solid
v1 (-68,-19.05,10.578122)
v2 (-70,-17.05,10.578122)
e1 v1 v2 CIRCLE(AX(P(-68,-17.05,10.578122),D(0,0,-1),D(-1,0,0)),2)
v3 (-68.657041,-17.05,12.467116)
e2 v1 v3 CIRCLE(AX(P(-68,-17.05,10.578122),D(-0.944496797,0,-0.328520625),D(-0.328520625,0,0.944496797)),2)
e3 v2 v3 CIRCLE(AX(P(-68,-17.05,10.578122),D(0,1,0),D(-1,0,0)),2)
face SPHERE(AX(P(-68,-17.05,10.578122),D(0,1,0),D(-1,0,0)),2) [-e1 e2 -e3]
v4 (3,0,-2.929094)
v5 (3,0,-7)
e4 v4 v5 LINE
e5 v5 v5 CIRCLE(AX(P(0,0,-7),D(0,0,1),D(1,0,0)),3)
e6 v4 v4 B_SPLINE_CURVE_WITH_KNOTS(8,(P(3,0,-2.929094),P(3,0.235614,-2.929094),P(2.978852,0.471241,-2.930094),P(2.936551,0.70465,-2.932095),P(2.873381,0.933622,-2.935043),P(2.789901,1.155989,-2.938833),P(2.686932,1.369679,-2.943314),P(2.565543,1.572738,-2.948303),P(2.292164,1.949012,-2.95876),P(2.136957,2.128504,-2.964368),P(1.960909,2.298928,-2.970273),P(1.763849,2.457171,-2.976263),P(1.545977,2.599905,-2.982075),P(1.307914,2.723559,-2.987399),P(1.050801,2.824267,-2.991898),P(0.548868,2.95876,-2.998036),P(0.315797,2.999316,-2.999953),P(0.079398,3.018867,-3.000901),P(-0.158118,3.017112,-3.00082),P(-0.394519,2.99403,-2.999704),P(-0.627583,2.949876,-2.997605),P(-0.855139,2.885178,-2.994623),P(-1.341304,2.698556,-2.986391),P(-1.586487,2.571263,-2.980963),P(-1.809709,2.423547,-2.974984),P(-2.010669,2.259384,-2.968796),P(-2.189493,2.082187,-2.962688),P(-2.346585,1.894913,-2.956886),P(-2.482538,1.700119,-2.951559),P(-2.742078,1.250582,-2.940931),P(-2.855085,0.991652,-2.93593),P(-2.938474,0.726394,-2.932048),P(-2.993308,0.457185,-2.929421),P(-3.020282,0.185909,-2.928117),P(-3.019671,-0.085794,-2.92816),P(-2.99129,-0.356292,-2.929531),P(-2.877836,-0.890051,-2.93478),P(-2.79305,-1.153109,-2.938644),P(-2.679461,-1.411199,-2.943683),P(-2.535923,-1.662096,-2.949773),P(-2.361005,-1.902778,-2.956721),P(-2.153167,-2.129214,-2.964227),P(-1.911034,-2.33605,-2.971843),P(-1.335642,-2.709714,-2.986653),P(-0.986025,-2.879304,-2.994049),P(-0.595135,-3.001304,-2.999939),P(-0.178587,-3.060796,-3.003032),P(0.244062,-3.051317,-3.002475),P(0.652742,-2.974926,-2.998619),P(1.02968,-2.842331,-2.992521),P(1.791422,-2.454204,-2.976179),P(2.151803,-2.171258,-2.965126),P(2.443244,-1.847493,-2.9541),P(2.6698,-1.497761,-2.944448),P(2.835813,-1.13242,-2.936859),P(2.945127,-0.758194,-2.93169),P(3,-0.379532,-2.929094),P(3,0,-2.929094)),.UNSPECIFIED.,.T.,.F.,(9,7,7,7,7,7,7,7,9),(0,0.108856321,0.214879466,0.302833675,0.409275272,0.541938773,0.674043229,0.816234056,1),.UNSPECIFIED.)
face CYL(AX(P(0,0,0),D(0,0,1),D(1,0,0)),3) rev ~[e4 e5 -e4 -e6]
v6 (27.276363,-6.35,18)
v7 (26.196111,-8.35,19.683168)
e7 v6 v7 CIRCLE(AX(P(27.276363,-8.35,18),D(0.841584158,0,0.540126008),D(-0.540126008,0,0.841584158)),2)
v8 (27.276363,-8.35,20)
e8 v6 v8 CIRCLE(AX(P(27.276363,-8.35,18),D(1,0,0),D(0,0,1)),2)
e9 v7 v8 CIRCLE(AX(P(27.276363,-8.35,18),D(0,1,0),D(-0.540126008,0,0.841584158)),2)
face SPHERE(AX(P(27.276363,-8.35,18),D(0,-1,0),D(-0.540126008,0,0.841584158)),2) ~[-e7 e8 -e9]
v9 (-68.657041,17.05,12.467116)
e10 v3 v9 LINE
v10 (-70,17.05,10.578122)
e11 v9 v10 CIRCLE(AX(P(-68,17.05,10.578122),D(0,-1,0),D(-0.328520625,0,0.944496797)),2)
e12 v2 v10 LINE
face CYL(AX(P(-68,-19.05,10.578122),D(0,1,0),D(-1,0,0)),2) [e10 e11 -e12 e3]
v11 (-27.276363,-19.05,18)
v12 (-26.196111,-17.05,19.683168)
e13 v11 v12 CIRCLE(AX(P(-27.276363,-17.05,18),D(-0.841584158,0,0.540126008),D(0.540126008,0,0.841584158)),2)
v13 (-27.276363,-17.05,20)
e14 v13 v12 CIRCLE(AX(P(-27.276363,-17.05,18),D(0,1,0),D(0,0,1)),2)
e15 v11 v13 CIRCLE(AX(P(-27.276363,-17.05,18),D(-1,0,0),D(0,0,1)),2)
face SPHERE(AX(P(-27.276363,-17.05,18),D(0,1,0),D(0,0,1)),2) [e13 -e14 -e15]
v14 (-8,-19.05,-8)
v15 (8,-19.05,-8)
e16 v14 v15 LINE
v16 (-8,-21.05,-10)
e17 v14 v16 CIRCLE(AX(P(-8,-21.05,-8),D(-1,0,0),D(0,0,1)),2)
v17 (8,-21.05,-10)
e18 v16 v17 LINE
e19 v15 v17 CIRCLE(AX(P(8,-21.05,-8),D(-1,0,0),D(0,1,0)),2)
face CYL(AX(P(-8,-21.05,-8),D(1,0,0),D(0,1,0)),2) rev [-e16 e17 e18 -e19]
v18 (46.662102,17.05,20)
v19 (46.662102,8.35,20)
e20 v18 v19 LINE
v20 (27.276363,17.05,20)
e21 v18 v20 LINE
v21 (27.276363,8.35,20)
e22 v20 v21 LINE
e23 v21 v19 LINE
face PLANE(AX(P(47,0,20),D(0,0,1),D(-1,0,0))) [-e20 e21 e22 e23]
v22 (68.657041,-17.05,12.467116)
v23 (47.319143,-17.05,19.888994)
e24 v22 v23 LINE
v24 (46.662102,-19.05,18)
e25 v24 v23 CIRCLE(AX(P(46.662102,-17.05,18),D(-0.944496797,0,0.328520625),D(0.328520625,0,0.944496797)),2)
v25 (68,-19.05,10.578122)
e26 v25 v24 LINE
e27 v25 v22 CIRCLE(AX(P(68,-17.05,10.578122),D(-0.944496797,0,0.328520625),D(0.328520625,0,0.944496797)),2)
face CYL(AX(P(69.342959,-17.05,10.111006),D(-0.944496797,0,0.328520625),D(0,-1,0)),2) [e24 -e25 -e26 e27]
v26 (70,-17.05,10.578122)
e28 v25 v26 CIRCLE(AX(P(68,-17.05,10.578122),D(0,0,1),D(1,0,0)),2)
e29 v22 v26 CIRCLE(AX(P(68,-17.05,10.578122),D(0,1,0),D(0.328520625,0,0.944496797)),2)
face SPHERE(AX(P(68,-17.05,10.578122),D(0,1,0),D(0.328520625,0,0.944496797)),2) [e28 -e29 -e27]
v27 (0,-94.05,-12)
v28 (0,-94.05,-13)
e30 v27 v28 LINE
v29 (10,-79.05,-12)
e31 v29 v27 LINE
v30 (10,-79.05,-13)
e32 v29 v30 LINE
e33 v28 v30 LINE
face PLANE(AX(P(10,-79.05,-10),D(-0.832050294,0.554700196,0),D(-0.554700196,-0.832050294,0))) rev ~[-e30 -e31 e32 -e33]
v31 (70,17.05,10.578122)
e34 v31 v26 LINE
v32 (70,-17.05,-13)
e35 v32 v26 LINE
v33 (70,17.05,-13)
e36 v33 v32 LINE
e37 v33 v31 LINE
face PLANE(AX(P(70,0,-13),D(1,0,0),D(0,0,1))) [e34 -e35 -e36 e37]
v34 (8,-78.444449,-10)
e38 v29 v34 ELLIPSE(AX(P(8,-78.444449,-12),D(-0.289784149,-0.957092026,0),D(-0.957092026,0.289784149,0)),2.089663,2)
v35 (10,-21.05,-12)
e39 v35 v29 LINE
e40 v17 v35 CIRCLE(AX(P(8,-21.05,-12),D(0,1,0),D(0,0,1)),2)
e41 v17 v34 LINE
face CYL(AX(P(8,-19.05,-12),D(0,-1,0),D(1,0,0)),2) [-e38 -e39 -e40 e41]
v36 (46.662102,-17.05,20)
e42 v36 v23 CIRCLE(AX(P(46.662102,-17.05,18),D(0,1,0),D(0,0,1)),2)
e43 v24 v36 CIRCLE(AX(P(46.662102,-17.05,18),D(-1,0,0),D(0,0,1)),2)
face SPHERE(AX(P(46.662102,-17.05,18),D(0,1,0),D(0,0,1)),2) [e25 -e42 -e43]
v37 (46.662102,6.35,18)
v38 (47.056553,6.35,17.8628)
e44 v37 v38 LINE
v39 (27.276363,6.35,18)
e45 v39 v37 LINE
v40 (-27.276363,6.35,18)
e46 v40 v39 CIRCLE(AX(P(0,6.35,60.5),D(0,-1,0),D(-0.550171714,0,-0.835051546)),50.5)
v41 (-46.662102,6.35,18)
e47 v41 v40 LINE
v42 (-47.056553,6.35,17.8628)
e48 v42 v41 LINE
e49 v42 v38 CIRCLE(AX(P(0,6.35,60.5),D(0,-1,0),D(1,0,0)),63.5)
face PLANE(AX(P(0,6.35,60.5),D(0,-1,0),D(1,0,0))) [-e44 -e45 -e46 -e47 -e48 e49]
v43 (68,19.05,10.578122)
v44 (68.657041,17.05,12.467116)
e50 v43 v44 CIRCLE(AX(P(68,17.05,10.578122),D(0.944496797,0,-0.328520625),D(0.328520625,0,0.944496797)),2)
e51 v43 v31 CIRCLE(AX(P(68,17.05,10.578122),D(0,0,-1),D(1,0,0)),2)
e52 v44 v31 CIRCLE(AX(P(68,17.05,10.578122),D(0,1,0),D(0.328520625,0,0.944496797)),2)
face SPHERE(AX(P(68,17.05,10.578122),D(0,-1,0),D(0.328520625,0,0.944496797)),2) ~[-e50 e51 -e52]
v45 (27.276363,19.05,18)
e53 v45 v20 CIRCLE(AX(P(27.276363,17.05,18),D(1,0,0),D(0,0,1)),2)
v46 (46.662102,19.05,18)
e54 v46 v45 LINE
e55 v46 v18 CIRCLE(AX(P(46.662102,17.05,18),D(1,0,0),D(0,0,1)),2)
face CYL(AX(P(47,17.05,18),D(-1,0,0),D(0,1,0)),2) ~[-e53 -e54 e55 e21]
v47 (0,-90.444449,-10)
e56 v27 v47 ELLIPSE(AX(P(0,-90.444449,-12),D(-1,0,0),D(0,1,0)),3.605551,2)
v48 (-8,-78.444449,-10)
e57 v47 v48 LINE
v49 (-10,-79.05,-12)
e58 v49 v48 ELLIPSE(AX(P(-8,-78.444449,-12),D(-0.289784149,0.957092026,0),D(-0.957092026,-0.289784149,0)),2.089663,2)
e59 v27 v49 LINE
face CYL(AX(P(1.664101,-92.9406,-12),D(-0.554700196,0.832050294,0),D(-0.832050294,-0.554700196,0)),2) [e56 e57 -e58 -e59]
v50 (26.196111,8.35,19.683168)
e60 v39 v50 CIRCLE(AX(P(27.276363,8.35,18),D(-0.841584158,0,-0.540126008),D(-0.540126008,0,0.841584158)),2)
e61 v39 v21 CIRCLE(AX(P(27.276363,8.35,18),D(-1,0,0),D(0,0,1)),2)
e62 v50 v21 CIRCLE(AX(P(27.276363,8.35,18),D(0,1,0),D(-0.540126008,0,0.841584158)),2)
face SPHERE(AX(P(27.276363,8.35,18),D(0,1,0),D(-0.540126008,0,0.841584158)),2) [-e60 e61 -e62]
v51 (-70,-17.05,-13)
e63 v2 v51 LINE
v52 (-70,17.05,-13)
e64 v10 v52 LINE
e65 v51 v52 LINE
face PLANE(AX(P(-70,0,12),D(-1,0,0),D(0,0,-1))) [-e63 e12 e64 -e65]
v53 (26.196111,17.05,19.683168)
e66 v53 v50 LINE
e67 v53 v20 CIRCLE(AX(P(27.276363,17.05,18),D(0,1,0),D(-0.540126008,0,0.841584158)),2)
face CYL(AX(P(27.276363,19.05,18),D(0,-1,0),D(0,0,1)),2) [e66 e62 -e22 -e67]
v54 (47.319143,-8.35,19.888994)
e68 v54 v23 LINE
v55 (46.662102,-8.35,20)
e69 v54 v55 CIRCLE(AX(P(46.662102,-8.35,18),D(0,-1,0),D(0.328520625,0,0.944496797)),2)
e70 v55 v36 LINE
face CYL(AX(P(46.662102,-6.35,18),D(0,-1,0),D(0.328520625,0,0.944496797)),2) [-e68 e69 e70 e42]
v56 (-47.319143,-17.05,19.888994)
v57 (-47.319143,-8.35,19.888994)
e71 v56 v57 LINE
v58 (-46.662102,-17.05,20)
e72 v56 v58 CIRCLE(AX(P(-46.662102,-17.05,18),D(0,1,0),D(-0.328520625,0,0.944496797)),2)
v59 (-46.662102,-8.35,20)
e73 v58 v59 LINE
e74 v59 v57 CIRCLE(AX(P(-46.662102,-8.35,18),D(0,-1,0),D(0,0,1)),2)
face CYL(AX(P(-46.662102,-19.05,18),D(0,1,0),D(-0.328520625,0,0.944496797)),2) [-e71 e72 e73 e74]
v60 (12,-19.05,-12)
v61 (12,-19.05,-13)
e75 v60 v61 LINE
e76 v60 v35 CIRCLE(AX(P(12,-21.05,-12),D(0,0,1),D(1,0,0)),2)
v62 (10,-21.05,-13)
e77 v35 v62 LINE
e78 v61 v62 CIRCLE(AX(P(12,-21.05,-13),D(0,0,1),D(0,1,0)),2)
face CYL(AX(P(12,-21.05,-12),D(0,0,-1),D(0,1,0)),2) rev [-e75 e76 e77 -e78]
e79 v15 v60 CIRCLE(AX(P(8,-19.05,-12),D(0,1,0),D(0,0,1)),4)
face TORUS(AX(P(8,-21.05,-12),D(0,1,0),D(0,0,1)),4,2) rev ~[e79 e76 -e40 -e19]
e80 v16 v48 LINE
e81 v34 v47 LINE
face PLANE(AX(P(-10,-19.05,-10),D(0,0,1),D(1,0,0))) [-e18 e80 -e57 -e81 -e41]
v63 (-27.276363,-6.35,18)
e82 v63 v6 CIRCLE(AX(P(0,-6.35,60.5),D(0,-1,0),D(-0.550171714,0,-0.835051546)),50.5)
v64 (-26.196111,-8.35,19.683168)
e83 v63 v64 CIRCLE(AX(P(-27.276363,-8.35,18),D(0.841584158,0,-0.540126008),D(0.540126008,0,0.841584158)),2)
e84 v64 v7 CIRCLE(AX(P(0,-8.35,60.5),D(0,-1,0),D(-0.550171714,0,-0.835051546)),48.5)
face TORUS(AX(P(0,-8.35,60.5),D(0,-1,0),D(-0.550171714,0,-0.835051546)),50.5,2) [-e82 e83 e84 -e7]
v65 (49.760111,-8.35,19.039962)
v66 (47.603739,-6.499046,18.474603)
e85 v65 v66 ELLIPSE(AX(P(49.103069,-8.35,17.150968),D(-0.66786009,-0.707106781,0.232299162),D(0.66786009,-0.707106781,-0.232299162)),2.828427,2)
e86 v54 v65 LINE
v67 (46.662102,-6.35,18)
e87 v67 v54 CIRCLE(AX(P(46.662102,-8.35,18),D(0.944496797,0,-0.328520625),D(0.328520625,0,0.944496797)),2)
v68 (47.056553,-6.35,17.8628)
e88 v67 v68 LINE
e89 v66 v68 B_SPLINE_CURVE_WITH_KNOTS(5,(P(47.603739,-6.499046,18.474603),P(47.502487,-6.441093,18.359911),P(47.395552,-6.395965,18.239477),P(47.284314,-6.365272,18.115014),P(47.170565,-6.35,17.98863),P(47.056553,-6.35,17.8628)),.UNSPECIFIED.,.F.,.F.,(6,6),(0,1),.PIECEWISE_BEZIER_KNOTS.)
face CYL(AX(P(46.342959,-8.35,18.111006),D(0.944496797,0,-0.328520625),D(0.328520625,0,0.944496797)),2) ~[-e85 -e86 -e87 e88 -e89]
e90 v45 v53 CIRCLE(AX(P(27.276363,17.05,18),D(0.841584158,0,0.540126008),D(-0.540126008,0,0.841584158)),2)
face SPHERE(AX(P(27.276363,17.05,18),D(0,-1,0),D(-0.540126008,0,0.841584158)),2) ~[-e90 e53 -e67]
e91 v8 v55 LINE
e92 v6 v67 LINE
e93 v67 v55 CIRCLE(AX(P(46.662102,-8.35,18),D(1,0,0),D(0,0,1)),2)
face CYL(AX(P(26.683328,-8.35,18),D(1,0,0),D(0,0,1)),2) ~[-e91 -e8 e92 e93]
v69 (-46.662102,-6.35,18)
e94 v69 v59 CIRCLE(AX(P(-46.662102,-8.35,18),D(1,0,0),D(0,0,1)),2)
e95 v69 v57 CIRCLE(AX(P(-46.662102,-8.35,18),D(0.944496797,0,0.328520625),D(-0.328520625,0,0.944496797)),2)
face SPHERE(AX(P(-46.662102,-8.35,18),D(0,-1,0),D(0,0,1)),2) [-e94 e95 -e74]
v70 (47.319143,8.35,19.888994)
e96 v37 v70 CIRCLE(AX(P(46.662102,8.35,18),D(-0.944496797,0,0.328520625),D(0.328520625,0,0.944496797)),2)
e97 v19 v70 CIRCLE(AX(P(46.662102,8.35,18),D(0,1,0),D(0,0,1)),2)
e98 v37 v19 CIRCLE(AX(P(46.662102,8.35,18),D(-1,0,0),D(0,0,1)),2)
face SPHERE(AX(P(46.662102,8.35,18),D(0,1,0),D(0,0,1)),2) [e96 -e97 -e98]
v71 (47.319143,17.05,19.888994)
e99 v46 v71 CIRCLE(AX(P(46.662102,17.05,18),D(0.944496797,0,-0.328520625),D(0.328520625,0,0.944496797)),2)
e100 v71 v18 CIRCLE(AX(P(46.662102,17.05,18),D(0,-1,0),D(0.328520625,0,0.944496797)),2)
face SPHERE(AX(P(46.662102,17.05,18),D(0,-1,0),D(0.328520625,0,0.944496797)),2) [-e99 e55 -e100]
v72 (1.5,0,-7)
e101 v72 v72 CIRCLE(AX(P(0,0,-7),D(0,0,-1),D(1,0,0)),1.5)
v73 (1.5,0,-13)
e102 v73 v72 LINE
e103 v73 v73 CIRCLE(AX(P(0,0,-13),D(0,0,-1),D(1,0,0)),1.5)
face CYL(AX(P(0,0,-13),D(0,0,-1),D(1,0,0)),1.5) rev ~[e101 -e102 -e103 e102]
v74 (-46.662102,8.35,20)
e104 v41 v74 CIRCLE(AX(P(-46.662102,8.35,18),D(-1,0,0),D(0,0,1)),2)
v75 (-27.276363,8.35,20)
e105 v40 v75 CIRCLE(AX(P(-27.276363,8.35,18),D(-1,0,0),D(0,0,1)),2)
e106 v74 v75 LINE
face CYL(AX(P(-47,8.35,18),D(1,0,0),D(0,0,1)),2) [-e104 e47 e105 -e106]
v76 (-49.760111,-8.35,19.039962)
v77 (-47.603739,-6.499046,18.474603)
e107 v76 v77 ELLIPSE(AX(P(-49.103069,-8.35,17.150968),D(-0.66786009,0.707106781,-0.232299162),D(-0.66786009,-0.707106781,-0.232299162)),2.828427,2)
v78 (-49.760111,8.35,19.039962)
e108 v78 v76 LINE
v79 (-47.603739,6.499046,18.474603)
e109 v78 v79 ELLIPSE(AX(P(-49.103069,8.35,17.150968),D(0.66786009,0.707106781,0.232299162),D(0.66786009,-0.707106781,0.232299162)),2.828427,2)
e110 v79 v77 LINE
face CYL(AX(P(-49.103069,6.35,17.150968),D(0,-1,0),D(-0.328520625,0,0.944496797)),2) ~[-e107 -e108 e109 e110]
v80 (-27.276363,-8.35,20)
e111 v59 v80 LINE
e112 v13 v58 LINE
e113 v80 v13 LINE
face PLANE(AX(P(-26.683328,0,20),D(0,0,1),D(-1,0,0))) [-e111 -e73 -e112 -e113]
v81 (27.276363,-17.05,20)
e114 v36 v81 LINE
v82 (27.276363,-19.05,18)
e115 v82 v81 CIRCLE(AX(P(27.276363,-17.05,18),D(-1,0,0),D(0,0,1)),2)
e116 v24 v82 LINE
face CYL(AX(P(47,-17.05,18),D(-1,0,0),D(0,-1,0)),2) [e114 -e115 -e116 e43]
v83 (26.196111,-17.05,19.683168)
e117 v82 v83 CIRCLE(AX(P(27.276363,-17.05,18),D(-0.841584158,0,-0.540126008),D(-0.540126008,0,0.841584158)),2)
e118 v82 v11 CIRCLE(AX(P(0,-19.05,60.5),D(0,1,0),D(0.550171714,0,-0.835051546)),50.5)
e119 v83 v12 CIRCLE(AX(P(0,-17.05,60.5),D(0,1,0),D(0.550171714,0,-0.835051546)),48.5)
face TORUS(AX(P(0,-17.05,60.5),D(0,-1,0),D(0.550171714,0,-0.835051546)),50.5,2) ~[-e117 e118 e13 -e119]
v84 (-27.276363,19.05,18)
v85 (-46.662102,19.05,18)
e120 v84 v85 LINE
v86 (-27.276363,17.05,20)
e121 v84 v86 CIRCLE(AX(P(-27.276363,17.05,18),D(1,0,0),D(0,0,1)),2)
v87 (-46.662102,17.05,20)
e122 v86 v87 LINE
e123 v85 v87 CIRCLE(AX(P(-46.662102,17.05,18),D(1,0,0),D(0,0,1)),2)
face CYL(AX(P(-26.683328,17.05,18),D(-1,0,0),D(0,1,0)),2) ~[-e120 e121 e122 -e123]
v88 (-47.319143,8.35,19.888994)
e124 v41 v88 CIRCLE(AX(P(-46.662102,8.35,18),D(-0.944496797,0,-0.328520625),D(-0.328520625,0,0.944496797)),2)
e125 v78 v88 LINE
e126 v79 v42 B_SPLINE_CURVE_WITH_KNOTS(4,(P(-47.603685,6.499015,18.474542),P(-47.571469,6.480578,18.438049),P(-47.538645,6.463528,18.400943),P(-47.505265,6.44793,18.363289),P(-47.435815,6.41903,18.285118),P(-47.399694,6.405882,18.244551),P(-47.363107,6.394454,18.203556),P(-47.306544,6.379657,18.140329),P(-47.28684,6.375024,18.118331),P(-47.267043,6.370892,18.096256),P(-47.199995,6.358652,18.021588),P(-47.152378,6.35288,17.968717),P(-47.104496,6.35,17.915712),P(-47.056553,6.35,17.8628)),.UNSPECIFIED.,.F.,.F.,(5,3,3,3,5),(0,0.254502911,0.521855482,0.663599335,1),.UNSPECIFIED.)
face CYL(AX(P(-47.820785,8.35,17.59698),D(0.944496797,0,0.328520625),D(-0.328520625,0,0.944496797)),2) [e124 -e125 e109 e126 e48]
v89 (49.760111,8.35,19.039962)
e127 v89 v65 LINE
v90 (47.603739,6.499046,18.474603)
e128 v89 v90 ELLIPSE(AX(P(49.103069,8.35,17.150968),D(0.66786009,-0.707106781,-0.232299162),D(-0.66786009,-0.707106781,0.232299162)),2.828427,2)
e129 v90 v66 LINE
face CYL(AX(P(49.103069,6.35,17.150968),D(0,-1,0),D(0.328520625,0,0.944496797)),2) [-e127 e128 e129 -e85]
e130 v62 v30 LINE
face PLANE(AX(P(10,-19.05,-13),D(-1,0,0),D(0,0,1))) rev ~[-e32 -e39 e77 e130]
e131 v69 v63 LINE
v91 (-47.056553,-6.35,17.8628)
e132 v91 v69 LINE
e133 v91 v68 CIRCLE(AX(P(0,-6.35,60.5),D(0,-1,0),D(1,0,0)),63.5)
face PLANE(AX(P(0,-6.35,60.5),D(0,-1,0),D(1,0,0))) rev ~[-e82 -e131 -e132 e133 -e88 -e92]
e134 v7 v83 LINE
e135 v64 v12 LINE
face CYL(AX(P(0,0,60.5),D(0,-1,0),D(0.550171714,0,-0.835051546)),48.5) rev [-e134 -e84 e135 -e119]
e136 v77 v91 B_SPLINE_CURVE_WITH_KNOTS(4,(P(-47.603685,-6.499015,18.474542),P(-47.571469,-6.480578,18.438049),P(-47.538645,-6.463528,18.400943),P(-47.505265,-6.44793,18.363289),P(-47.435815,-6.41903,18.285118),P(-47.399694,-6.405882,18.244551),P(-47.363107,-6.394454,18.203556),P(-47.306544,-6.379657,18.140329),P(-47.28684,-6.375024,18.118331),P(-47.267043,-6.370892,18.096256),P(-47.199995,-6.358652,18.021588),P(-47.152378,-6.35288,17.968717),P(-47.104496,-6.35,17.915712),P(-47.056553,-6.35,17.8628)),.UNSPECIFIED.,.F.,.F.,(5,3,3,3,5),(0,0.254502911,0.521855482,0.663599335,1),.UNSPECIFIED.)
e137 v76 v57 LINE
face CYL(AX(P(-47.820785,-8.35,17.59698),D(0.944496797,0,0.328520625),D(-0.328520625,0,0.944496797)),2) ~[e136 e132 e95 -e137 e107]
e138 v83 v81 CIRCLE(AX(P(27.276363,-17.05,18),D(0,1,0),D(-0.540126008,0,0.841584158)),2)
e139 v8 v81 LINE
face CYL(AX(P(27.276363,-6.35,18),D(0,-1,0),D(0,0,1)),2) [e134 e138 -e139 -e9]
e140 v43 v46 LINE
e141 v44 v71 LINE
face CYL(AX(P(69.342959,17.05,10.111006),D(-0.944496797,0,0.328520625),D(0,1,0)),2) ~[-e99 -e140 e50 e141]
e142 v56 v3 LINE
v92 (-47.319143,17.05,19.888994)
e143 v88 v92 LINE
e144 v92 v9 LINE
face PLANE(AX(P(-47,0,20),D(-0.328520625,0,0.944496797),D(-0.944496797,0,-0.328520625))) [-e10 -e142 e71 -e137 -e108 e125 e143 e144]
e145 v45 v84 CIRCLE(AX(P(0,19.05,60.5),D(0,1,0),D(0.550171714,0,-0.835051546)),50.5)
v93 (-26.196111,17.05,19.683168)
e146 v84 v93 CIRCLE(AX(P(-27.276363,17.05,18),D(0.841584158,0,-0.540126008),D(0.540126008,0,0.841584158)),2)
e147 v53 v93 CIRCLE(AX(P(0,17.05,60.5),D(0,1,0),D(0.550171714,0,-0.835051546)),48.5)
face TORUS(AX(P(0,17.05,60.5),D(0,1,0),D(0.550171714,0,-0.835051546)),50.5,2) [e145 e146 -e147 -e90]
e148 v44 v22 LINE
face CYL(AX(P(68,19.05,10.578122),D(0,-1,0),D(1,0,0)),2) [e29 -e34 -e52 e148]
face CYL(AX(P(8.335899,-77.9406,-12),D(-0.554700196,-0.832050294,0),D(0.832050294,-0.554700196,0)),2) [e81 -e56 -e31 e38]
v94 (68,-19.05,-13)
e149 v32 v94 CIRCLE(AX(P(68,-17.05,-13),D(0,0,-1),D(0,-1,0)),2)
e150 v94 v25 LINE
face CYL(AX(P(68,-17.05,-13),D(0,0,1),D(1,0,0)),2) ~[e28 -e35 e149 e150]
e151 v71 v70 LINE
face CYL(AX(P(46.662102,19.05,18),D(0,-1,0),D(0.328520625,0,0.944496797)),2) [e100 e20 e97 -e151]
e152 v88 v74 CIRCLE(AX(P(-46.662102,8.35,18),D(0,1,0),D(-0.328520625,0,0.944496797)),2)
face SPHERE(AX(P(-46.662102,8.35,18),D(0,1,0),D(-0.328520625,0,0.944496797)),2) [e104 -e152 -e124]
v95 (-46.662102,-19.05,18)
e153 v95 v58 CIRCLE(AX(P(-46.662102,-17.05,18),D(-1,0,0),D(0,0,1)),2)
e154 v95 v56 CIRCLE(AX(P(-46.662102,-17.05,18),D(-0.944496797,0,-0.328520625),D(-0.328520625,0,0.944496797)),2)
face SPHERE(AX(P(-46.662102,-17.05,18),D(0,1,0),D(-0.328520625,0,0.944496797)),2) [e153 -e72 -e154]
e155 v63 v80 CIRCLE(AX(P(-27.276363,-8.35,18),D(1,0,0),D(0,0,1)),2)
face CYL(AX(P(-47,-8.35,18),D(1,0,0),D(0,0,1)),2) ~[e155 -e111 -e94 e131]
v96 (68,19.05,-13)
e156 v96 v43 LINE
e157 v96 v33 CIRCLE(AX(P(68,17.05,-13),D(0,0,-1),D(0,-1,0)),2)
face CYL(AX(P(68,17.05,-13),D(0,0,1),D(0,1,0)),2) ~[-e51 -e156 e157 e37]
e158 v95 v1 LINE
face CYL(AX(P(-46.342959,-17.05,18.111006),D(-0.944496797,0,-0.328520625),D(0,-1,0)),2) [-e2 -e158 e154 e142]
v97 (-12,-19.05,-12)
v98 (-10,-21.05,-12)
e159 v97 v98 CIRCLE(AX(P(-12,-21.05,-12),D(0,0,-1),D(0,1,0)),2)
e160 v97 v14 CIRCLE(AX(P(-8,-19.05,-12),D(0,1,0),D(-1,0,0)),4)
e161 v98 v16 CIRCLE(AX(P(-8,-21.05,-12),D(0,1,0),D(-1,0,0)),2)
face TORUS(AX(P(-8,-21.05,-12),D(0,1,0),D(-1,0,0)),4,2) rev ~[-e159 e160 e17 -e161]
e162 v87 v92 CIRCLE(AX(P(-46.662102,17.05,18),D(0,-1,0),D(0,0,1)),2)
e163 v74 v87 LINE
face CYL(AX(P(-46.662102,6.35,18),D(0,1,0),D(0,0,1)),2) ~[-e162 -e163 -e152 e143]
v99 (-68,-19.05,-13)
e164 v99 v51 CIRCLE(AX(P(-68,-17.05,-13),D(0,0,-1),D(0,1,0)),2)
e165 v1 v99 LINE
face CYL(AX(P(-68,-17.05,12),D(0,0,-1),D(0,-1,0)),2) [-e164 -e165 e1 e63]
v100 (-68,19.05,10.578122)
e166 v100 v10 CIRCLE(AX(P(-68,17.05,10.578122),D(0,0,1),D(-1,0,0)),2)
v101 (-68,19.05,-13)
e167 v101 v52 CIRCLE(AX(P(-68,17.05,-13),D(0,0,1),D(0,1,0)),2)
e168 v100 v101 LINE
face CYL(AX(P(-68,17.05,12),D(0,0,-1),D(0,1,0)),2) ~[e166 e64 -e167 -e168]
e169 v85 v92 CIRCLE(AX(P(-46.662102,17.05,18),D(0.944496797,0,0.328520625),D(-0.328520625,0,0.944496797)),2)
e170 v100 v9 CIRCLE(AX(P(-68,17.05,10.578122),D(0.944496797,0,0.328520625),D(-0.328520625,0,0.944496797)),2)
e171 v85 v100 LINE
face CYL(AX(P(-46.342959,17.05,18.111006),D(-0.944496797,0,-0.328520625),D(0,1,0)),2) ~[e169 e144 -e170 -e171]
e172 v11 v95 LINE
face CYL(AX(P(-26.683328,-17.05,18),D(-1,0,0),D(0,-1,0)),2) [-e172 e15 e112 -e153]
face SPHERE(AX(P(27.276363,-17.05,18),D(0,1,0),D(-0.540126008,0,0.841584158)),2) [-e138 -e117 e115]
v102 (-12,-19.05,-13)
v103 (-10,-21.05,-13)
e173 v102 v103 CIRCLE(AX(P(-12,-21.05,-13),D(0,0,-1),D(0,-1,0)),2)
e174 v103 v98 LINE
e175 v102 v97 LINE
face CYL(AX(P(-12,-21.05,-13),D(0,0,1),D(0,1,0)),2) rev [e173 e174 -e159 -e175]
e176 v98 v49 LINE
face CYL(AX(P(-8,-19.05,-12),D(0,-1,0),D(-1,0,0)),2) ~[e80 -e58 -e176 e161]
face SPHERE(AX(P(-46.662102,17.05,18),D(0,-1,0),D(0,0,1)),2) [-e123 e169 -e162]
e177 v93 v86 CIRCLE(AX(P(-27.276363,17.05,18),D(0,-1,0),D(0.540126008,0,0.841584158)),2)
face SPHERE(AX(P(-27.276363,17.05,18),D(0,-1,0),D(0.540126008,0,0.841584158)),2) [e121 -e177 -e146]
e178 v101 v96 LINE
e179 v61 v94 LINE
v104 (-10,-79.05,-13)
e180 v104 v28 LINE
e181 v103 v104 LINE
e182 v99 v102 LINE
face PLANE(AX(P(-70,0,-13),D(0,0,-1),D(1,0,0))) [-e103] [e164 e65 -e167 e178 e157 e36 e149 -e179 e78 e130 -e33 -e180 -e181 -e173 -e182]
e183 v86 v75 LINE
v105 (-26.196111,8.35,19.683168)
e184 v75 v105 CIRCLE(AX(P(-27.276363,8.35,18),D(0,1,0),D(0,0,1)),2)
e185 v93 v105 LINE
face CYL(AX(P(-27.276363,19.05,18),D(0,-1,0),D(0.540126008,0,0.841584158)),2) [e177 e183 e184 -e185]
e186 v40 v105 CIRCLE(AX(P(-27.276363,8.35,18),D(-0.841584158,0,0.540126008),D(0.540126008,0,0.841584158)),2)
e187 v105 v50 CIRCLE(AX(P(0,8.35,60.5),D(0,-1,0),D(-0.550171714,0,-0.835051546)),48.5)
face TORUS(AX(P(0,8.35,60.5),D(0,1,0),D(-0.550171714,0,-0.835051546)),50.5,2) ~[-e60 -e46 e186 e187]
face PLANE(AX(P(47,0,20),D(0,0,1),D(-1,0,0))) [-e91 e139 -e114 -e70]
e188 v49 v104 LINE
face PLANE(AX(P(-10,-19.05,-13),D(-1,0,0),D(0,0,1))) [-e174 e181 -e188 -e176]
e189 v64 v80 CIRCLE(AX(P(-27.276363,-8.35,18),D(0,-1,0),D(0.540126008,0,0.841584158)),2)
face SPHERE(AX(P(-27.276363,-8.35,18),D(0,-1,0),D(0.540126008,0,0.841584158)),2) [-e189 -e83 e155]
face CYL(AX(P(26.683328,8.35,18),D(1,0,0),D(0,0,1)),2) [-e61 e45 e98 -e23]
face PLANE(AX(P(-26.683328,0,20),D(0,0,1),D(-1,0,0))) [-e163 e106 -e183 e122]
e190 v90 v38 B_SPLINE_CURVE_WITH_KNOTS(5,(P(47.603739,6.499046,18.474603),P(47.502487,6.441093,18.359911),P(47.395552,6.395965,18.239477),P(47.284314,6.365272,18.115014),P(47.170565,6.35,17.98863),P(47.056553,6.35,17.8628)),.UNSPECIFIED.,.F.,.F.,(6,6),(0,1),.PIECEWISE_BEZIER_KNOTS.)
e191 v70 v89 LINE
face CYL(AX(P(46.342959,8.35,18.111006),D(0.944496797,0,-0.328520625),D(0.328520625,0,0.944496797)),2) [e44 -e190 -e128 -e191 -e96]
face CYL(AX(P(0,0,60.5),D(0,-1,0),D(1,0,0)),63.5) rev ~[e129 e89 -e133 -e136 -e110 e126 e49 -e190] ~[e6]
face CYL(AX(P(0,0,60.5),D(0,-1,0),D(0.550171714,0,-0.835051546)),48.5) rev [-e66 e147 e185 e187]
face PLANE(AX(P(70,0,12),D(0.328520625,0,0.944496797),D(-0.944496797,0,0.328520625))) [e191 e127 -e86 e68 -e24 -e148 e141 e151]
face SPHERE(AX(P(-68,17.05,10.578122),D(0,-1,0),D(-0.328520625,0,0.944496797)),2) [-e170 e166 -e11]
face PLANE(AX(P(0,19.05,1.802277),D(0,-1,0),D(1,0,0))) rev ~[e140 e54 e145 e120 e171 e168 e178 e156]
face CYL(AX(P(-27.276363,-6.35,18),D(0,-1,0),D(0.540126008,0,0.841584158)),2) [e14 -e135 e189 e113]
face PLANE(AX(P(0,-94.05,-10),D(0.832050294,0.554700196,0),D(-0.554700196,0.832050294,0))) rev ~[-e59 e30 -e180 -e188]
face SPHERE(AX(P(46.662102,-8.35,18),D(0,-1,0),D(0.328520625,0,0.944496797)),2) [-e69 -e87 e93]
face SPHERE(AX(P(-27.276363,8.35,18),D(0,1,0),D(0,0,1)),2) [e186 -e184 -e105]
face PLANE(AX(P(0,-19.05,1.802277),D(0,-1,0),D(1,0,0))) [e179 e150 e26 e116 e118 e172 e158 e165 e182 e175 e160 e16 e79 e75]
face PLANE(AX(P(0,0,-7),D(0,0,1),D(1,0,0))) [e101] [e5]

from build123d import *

# Parameters (mm, degrees)
F1_DEPTH  = 19.05
F2_R      = 63.5
F3_DEPTH  = 6.35
F4_R      = 2
F5_R      = 1.5
F6_DEPTH  = 33.001
F7_R      = 3
F8_DEPTH  = 7
F9_W      = 20
F9_H      = 3
F10_DEPTH = 75
F12_DEPTH = 3.001
F13_F1_R  = 2
F13_F2_R  = 2


with BuildPart() as f1:
    # F0 (on Front) → F1 (new body, symmetric)
    with BuildSketch(Plane.XZ):
        with BuildLine():
            Line((-70, -13), (70, -13))
            Line((70, -13), (70, 12))
            Line((70, 12), (47, 20))
            Line((47, 20), (26.6833281283, 20))
            ThreePointArc((26.6833281283, 20), (0, 12), (-26.6833281283, 20))
            Line((-26.6833281283, 20), (-47, 20))
            Line((-47, 20), (-70, 12))
            Line((-70, 12), (-70, -13))
        make_face()
    extrude(amount=F1_DEPTH, both=True)

    # F2 (on Front) → F3 (cut, symmetric)
    with BuildSketch(Plane.XZ):
        with Locations((0, 60.5)):
            Circle(F2_R)
    extrude(amount=F3_DEPTH, both=True, mode=Mode.SUBTRACT)

    # F4
    f4_edges = [f1.edges().sort_by_distance(p)[0] for p in [
        (-70, -19.05, -0.5),
        (-58.5, -19.05, 16),
        (-36.841664, -19.05, 20),
        (0, -19.05, 12),
        (36.841664, -19.05, 20),
        (58.5, -19.05, 16),
        (70, -19.05, -0.5),
        (70, 0, 12),
        (47, -12.7, 20),
        (26.683328, -12.7, 20),
        (26.683328, 12.7, 20),
        (47.738913, -6.35, 19.742987),
        (48.477826, 0, 19.485974),
        (47.738913, 6.35, 19.742987),
        (47, 12.7, 20),
        (58.5, 19.05, 16),
        (70, 19.05, -0.5),
        (0, 6.35, 12),
        (-26.683328, 12.7, 20),
        (0, 19.05, 12),
        (-26.683328, -12.7, 20),
        (0, -6.35, 12),
        (-47, -12.7, 20),
        (-36.841664, -6.35, 20),
        (-36.841664, 6.35, 20),
        (-47, 12.7, 20),
        (-36.841664, 19.05, 20),
        (-47.738913, 6.35, 19.742987),
        (-48.477826, 0, 19.485974),
        (-47.738913, -6.35, 19.742987),
        (-70, 0, 12),
        (-58.5, 19.05, 16),
        (-70, 19.05, -0.5),
        (36.841664, 6.35, 20),
        (36.841664, 19.05, 20),
        (36.841664, -6.35, 20),
    ]]
    fillet(f4_edges, radius=F4_R)

    # F5 (on face) → F6 (cut, through all)
    with BuildSketch(Plane(origin=(0, 0, -13), x_dir=(1, 0, 0), z_dir=(0, 0, -1))):
        Circle(F5_R)
    extrude(amount=-F6_DEPTH, mode=Mode.SUBTRACT)

    # F7 (on Top) → F8 (cut)
    with BuildSketch(Plane.XY):
        Circle(F7_R)
    extrude(amount=-F8_DEPTH, mode=Mode.SUBTRACT)

    # F9 (on face) → F10 (join)
    with BuildSketch(Plane.XZ.offset(19.05)):
        with Locations((0, -11.5)):
            Rectangle(F9_W, F9_H)
    extrude(amount=F10_DEPTH)

    # F11 (on face) → F12 (cut, through all)
    with BuildSketch(Plane.XY.offset(-10)):
        Polygon((-10, -94.05), (0, -94.05), (-10, -79.05), align=None)
        Polygon((10, -79.05), (0, -94.05), (10, -94.05), align=None)
    extrude(amount=-F12_DEPTH, mode=Mode.SUBTRACT)

    # F13: fillet of radius 2 on 5 edges, made by hand

    # F13_f1
    f13_f1_edges = [f1.edges().sort_by_distance(p)[0] for p in [
        (-10, -49.05, -10),
        (-5, -86.55, -10),
        (5, -86.55, -10),
        (10, -49.05, -10),
    ]]
    fillet(f13_f1_edges, radius=F13_F1_R)

    # F13_f2
    f13_f2_edges = [f1.edges().sort_by_distance(p)[0] for p in [
        (0, -19.05, -10),
        (9.4142135624, -19.05, -10.5857864376),
        (-9.4142135624, -19.05, -10.5857864376),
    ]]
    fillet(f13_f2_edges, radius=F13_F2_R)


solid = f1.part
